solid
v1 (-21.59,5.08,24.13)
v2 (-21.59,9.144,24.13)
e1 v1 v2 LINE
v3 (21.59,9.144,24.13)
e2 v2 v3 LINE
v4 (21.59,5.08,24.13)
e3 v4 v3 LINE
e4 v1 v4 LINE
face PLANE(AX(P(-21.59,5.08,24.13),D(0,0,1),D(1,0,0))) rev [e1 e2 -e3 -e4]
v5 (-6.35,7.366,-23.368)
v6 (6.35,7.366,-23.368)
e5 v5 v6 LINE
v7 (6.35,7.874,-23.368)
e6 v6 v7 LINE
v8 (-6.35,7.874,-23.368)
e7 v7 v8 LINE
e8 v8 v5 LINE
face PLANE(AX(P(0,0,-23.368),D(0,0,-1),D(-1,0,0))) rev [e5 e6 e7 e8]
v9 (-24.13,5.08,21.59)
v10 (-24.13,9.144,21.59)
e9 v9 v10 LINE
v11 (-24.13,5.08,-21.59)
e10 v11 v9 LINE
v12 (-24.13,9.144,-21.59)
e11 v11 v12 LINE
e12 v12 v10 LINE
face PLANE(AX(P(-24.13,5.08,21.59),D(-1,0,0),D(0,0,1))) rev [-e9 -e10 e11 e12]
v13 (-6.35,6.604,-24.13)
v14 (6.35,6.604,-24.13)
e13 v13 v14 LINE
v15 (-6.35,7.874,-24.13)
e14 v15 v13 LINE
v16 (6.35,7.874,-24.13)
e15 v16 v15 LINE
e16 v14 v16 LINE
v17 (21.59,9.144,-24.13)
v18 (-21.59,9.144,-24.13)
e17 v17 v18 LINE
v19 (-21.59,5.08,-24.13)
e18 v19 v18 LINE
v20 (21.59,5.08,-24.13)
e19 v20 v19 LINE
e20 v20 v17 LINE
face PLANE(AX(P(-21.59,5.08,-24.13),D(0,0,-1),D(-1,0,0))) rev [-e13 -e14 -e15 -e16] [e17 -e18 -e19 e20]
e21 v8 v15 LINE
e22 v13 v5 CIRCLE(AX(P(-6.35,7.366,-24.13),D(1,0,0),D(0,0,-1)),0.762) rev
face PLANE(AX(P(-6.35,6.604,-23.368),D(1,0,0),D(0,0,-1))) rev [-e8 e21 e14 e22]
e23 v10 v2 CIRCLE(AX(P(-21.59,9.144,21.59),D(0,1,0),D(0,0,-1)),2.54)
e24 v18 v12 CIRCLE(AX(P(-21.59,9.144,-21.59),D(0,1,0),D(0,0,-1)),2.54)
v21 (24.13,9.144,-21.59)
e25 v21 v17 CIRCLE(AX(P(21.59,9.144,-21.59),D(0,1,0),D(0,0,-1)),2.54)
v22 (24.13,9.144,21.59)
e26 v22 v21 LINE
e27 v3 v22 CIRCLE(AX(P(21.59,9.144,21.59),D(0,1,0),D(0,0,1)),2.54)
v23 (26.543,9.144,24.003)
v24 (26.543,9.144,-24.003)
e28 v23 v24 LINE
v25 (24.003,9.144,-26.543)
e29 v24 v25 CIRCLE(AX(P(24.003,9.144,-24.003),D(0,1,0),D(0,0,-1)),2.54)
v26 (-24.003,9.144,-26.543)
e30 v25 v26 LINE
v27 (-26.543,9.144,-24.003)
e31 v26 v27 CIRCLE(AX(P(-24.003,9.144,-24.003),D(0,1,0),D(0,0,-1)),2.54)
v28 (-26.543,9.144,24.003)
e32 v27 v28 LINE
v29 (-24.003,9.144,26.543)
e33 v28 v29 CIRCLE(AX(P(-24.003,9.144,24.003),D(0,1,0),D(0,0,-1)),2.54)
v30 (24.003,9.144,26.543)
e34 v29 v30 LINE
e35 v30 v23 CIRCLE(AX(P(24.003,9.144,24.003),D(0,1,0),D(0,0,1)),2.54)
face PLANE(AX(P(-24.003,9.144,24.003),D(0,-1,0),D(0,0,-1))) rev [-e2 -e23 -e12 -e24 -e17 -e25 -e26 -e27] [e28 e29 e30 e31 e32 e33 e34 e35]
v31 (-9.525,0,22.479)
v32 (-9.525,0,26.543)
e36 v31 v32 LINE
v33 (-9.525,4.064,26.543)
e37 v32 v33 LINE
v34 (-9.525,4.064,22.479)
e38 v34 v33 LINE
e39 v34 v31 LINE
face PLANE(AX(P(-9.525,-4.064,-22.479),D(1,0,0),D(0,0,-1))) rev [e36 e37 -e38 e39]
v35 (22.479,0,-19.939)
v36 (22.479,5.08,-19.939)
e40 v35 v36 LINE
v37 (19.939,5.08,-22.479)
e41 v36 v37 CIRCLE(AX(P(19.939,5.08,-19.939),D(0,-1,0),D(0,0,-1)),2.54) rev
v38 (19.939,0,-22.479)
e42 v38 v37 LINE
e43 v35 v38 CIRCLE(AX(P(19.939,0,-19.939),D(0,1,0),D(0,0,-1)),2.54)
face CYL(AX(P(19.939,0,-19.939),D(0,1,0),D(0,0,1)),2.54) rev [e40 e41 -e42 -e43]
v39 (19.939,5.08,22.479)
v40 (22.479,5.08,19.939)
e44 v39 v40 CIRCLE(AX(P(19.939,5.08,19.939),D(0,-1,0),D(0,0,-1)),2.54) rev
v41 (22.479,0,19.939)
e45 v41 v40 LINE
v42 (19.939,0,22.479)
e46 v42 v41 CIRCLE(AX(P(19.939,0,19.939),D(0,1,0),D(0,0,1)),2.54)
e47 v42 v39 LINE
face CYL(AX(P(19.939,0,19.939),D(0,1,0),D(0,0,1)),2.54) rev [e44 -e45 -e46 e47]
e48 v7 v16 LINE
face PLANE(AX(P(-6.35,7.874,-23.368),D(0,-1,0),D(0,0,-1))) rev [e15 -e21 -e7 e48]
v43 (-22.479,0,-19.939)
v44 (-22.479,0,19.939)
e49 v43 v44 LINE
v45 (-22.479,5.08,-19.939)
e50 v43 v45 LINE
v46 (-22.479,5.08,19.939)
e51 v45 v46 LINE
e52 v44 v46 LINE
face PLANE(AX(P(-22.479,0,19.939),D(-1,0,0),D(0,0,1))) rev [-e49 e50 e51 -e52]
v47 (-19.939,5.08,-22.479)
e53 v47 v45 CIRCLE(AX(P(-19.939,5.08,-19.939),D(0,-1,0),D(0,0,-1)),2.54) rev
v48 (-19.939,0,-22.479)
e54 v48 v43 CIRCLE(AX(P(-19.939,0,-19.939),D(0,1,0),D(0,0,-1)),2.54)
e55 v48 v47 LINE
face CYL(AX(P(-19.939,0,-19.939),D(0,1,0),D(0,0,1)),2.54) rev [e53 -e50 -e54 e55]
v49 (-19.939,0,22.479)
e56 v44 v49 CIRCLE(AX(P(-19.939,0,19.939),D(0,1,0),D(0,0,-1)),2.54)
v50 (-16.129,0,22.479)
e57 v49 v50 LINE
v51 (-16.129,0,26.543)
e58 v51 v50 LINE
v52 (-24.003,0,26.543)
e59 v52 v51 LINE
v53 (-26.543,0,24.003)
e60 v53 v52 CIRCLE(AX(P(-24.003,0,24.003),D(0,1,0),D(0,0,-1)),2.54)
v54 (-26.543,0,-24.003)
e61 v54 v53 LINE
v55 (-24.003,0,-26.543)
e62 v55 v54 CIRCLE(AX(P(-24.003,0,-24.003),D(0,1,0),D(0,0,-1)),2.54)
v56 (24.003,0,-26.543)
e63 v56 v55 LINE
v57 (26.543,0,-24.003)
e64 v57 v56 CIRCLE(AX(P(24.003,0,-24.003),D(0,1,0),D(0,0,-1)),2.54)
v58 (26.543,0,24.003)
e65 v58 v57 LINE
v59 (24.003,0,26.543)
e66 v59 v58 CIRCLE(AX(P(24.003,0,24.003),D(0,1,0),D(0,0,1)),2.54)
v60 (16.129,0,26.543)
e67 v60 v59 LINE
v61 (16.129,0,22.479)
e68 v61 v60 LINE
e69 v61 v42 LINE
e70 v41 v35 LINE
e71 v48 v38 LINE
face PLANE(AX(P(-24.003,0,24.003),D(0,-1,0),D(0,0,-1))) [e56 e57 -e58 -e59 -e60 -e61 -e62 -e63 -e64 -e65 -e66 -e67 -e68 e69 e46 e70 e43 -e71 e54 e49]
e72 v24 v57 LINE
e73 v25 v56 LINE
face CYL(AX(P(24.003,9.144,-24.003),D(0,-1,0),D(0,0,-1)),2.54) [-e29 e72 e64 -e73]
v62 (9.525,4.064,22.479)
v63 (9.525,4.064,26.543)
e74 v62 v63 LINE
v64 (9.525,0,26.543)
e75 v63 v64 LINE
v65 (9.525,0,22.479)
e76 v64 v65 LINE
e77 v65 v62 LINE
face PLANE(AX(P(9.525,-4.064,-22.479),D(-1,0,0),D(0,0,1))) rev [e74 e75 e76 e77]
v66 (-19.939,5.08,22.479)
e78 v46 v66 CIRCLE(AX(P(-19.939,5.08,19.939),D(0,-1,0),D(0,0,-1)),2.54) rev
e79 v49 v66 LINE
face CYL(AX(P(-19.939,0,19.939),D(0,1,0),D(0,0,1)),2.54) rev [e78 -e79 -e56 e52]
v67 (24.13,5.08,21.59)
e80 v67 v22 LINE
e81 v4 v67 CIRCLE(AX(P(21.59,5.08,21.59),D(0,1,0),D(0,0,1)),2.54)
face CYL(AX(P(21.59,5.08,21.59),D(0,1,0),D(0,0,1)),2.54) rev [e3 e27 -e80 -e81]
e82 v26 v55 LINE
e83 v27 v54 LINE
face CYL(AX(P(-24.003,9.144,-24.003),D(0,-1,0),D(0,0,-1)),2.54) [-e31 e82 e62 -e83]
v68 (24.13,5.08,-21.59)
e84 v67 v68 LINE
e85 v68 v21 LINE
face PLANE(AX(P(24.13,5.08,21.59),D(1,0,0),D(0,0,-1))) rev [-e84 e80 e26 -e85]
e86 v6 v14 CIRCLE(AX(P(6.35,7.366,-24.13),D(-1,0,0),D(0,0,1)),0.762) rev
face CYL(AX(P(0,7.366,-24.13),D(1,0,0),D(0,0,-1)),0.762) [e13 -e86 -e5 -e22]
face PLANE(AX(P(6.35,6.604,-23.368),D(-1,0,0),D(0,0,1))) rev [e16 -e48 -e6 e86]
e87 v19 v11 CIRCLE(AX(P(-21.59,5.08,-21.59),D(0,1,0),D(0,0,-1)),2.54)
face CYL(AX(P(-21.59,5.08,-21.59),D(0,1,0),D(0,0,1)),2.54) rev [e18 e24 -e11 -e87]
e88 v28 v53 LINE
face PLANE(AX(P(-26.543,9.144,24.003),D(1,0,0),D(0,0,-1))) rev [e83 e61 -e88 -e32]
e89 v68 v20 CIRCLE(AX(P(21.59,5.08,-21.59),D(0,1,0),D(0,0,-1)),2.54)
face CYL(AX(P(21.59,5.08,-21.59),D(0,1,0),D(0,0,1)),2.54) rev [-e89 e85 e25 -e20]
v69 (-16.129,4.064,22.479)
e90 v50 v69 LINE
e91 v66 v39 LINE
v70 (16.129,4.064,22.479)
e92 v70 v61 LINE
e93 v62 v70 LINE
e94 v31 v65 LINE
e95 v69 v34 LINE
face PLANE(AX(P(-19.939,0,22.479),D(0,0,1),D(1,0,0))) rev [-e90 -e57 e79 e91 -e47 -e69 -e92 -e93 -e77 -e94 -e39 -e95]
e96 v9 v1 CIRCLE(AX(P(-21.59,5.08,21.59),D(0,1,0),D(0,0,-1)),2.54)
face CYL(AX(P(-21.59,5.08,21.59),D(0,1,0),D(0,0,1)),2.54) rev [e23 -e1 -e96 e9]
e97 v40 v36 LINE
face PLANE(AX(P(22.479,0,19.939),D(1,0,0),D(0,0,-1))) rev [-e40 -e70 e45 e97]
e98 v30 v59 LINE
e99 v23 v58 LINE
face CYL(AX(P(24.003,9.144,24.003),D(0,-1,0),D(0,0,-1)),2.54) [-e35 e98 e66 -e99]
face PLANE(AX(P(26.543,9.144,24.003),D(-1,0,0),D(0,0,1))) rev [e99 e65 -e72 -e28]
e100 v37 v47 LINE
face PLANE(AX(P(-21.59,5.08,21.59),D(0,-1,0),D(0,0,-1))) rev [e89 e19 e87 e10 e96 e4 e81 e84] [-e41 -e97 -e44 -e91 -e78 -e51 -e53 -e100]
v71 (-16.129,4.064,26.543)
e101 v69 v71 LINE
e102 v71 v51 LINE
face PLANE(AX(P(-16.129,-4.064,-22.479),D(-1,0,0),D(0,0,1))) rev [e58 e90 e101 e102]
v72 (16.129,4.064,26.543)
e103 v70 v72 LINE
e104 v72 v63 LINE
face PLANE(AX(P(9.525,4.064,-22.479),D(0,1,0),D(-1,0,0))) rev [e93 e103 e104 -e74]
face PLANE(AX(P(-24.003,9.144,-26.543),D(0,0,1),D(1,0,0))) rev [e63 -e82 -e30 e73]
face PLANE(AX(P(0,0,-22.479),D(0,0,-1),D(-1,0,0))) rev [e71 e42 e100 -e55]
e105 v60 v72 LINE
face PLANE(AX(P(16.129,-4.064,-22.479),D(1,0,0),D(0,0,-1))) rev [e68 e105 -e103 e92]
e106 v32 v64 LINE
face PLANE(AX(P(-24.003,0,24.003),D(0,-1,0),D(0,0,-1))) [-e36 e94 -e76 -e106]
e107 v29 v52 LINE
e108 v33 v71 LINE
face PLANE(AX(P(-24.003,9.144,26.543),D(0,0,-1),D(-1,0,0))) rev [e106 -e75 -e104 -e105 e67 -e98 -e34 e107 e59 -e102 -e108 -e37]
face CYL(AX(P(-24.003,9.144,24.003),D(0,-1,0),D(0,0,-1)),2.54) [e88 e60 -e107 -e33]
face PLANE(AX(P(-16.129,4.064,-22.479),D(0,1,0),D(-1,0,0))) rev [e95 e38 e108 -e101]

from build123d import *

# Parameters (mm, degrees)
BOSS_EXTRUDE2_DEPTH = 9.144
SKETCH2_W           = 6.604
SKETCH2_H           = 8.128
CUT_EXTRUDE1_DEPTH  = 49.022
CUT_EXTRUDE3_DEPTH  = 39.635145062
CUT_EXTRUDE4_DEPTH  = 4.064
SKETCH7_W           = 12.7
SKETCH7_H           = 1.27
BOSS_EXTRUDE3_DEPTH = 0.762
FILLET1_R           = 0.762


with BuildPart() as part:
    # Sketch1 → Boss-Extrude2 (new body)
    with BuildSketch(Plane(origin=(0, 0, 0), x_dir=(1, 0, 0), z_dir=(0, 1, 0))):
        with BuildLine():
            Line((-24.003, -26.543), (24.003, -26.543))
            ThreePointArc((24.003, -26.543), (25.799051224, -25.799051224), (26.543, -24.003))
            Line((26.543, -24.003), (26.543, 24.003))
            ThreePointArc((26.543, 24.003), (25.799051224, 25.799051224), (24.003, 26.543))
            Line((24.003, 26.543), (-24.003, 26.543))
            ThreePointArc((-24.003, 26.543), (-25.799051224, 25.799051224), (-26.543, 24.003))
            Line((-26.543, 24.003), (-26.543, -24.003))
            ThreePointArc((-26.543, -24.003), (-25.799051224, -25.799051224), (-24.003, -26.543))
        make_face()
    extrude(amount=BOSS_EXTRUDE2_DEPTH)

    # Sketch2 → Cut-Extrude1 (cut)
    with BuildSketch(Plane.XY.offset(26.543)):
        with Locations((12.827, 0)):
            Rectangle(SKETCH2_W, SKETCH2_H)
        with Locations((-12.827, 0)):
            Rectangle(SKETCH2_W, SKETCH2_H)
    extrude(amount=-CUT_EXTRUDE1_DEPTH, mode=Mode.SUBTRACT)

    # Sketch5 → Cut-Extrude3 (cut, through all)
    with BuildSketch(Plane(origin=(0, 9.144, 0), x_dir=(1, 0, 0), z_dir=(0, 1, 0))):
        with BuildLine():
            Line((-19.939, -22.479), (19.939, -22.479))
            ThreePointArc((19.939, -22.479), (21.735051224, -21.735051224), (22.479, -19.939))
            Line((22.479, -19.939), (22.479, 19.939))
            ThreePointArc((22.479, 19.939), (21.735051224, 21.735051224), (19.939, 22.479))
            Line((19.939, 22.479), (-19.939, 22.479))
            ThreePointArc((-19.939, 22.479), (-21.735051224, 21.735051224), (-22.479, 19.939))
            Line((-22.479, 19.939), (-22.479, -19.939))
            ThreePointArc((-22.479, -19.939), (-21.735051224, -21.735051224), (-19.939, -22.479))
        make_face()
    extrude(amount=-CUT_EXTRUDE3_DEPTH, mode=Mode.SUBTRACT)

    # Sketch6 → Cut-Extrude4 (cut)
    with BuildSketch(Plane(origin=(0, 9.144, 0), x_dir=(1, 0, 0), z_dir=(0, 1, 0))):
        with BuildLine():
            Line((-21.59, -24.13), (21.59, -24.13))
            ThreePointArc((21.59, -24.13), (23.386051224, -23.386051224), (24.13, -21.59))
            Line((24.13, -21.59), (24.13, 21.59))
            ThreePointArc((24.13, 21.59), (23.386051224, 23.386051224), (21.59, 24.13))
            Line((21.59, 24.13), (-21.59, 24.13))
            ThreePointArc((-21.59, 24.13), (-23.386051224, 23.386051224), (-24.13, 21.59))
            Line((-24.13, 21.59), (-24.13, -21.59))
            ThreePointArc((-24.13, -21.59), (-23.386051224, -23.386051224), (-21.59, -24.13))
        make_face()
    extrude(amount=-CUT_EXTRUDE4_DEPTH, mode=Mode.SUBTRACT)

    # Sketch7 → Boss-Extrude3 (add)
    with BuildSketch(Plane.XY.offset(-24.13)):
        with Locations((0, 7.239)):
            Rectangle(SKETCH7_W, SKETCH7_H)
    extrude(amount=BOSS_EXTRUDE3_DEPTH)

    # Fillet1
    fillet1_edges = [part.edges().sort_by_distance(p)[0] for p in [
        (0, 6.604, -23.368),
    ]]
    fillet(fillet1_edges, radius=FILLET1_R - 0.0001)  # a hair under: the kernel refuses the full size


solid = part.part
